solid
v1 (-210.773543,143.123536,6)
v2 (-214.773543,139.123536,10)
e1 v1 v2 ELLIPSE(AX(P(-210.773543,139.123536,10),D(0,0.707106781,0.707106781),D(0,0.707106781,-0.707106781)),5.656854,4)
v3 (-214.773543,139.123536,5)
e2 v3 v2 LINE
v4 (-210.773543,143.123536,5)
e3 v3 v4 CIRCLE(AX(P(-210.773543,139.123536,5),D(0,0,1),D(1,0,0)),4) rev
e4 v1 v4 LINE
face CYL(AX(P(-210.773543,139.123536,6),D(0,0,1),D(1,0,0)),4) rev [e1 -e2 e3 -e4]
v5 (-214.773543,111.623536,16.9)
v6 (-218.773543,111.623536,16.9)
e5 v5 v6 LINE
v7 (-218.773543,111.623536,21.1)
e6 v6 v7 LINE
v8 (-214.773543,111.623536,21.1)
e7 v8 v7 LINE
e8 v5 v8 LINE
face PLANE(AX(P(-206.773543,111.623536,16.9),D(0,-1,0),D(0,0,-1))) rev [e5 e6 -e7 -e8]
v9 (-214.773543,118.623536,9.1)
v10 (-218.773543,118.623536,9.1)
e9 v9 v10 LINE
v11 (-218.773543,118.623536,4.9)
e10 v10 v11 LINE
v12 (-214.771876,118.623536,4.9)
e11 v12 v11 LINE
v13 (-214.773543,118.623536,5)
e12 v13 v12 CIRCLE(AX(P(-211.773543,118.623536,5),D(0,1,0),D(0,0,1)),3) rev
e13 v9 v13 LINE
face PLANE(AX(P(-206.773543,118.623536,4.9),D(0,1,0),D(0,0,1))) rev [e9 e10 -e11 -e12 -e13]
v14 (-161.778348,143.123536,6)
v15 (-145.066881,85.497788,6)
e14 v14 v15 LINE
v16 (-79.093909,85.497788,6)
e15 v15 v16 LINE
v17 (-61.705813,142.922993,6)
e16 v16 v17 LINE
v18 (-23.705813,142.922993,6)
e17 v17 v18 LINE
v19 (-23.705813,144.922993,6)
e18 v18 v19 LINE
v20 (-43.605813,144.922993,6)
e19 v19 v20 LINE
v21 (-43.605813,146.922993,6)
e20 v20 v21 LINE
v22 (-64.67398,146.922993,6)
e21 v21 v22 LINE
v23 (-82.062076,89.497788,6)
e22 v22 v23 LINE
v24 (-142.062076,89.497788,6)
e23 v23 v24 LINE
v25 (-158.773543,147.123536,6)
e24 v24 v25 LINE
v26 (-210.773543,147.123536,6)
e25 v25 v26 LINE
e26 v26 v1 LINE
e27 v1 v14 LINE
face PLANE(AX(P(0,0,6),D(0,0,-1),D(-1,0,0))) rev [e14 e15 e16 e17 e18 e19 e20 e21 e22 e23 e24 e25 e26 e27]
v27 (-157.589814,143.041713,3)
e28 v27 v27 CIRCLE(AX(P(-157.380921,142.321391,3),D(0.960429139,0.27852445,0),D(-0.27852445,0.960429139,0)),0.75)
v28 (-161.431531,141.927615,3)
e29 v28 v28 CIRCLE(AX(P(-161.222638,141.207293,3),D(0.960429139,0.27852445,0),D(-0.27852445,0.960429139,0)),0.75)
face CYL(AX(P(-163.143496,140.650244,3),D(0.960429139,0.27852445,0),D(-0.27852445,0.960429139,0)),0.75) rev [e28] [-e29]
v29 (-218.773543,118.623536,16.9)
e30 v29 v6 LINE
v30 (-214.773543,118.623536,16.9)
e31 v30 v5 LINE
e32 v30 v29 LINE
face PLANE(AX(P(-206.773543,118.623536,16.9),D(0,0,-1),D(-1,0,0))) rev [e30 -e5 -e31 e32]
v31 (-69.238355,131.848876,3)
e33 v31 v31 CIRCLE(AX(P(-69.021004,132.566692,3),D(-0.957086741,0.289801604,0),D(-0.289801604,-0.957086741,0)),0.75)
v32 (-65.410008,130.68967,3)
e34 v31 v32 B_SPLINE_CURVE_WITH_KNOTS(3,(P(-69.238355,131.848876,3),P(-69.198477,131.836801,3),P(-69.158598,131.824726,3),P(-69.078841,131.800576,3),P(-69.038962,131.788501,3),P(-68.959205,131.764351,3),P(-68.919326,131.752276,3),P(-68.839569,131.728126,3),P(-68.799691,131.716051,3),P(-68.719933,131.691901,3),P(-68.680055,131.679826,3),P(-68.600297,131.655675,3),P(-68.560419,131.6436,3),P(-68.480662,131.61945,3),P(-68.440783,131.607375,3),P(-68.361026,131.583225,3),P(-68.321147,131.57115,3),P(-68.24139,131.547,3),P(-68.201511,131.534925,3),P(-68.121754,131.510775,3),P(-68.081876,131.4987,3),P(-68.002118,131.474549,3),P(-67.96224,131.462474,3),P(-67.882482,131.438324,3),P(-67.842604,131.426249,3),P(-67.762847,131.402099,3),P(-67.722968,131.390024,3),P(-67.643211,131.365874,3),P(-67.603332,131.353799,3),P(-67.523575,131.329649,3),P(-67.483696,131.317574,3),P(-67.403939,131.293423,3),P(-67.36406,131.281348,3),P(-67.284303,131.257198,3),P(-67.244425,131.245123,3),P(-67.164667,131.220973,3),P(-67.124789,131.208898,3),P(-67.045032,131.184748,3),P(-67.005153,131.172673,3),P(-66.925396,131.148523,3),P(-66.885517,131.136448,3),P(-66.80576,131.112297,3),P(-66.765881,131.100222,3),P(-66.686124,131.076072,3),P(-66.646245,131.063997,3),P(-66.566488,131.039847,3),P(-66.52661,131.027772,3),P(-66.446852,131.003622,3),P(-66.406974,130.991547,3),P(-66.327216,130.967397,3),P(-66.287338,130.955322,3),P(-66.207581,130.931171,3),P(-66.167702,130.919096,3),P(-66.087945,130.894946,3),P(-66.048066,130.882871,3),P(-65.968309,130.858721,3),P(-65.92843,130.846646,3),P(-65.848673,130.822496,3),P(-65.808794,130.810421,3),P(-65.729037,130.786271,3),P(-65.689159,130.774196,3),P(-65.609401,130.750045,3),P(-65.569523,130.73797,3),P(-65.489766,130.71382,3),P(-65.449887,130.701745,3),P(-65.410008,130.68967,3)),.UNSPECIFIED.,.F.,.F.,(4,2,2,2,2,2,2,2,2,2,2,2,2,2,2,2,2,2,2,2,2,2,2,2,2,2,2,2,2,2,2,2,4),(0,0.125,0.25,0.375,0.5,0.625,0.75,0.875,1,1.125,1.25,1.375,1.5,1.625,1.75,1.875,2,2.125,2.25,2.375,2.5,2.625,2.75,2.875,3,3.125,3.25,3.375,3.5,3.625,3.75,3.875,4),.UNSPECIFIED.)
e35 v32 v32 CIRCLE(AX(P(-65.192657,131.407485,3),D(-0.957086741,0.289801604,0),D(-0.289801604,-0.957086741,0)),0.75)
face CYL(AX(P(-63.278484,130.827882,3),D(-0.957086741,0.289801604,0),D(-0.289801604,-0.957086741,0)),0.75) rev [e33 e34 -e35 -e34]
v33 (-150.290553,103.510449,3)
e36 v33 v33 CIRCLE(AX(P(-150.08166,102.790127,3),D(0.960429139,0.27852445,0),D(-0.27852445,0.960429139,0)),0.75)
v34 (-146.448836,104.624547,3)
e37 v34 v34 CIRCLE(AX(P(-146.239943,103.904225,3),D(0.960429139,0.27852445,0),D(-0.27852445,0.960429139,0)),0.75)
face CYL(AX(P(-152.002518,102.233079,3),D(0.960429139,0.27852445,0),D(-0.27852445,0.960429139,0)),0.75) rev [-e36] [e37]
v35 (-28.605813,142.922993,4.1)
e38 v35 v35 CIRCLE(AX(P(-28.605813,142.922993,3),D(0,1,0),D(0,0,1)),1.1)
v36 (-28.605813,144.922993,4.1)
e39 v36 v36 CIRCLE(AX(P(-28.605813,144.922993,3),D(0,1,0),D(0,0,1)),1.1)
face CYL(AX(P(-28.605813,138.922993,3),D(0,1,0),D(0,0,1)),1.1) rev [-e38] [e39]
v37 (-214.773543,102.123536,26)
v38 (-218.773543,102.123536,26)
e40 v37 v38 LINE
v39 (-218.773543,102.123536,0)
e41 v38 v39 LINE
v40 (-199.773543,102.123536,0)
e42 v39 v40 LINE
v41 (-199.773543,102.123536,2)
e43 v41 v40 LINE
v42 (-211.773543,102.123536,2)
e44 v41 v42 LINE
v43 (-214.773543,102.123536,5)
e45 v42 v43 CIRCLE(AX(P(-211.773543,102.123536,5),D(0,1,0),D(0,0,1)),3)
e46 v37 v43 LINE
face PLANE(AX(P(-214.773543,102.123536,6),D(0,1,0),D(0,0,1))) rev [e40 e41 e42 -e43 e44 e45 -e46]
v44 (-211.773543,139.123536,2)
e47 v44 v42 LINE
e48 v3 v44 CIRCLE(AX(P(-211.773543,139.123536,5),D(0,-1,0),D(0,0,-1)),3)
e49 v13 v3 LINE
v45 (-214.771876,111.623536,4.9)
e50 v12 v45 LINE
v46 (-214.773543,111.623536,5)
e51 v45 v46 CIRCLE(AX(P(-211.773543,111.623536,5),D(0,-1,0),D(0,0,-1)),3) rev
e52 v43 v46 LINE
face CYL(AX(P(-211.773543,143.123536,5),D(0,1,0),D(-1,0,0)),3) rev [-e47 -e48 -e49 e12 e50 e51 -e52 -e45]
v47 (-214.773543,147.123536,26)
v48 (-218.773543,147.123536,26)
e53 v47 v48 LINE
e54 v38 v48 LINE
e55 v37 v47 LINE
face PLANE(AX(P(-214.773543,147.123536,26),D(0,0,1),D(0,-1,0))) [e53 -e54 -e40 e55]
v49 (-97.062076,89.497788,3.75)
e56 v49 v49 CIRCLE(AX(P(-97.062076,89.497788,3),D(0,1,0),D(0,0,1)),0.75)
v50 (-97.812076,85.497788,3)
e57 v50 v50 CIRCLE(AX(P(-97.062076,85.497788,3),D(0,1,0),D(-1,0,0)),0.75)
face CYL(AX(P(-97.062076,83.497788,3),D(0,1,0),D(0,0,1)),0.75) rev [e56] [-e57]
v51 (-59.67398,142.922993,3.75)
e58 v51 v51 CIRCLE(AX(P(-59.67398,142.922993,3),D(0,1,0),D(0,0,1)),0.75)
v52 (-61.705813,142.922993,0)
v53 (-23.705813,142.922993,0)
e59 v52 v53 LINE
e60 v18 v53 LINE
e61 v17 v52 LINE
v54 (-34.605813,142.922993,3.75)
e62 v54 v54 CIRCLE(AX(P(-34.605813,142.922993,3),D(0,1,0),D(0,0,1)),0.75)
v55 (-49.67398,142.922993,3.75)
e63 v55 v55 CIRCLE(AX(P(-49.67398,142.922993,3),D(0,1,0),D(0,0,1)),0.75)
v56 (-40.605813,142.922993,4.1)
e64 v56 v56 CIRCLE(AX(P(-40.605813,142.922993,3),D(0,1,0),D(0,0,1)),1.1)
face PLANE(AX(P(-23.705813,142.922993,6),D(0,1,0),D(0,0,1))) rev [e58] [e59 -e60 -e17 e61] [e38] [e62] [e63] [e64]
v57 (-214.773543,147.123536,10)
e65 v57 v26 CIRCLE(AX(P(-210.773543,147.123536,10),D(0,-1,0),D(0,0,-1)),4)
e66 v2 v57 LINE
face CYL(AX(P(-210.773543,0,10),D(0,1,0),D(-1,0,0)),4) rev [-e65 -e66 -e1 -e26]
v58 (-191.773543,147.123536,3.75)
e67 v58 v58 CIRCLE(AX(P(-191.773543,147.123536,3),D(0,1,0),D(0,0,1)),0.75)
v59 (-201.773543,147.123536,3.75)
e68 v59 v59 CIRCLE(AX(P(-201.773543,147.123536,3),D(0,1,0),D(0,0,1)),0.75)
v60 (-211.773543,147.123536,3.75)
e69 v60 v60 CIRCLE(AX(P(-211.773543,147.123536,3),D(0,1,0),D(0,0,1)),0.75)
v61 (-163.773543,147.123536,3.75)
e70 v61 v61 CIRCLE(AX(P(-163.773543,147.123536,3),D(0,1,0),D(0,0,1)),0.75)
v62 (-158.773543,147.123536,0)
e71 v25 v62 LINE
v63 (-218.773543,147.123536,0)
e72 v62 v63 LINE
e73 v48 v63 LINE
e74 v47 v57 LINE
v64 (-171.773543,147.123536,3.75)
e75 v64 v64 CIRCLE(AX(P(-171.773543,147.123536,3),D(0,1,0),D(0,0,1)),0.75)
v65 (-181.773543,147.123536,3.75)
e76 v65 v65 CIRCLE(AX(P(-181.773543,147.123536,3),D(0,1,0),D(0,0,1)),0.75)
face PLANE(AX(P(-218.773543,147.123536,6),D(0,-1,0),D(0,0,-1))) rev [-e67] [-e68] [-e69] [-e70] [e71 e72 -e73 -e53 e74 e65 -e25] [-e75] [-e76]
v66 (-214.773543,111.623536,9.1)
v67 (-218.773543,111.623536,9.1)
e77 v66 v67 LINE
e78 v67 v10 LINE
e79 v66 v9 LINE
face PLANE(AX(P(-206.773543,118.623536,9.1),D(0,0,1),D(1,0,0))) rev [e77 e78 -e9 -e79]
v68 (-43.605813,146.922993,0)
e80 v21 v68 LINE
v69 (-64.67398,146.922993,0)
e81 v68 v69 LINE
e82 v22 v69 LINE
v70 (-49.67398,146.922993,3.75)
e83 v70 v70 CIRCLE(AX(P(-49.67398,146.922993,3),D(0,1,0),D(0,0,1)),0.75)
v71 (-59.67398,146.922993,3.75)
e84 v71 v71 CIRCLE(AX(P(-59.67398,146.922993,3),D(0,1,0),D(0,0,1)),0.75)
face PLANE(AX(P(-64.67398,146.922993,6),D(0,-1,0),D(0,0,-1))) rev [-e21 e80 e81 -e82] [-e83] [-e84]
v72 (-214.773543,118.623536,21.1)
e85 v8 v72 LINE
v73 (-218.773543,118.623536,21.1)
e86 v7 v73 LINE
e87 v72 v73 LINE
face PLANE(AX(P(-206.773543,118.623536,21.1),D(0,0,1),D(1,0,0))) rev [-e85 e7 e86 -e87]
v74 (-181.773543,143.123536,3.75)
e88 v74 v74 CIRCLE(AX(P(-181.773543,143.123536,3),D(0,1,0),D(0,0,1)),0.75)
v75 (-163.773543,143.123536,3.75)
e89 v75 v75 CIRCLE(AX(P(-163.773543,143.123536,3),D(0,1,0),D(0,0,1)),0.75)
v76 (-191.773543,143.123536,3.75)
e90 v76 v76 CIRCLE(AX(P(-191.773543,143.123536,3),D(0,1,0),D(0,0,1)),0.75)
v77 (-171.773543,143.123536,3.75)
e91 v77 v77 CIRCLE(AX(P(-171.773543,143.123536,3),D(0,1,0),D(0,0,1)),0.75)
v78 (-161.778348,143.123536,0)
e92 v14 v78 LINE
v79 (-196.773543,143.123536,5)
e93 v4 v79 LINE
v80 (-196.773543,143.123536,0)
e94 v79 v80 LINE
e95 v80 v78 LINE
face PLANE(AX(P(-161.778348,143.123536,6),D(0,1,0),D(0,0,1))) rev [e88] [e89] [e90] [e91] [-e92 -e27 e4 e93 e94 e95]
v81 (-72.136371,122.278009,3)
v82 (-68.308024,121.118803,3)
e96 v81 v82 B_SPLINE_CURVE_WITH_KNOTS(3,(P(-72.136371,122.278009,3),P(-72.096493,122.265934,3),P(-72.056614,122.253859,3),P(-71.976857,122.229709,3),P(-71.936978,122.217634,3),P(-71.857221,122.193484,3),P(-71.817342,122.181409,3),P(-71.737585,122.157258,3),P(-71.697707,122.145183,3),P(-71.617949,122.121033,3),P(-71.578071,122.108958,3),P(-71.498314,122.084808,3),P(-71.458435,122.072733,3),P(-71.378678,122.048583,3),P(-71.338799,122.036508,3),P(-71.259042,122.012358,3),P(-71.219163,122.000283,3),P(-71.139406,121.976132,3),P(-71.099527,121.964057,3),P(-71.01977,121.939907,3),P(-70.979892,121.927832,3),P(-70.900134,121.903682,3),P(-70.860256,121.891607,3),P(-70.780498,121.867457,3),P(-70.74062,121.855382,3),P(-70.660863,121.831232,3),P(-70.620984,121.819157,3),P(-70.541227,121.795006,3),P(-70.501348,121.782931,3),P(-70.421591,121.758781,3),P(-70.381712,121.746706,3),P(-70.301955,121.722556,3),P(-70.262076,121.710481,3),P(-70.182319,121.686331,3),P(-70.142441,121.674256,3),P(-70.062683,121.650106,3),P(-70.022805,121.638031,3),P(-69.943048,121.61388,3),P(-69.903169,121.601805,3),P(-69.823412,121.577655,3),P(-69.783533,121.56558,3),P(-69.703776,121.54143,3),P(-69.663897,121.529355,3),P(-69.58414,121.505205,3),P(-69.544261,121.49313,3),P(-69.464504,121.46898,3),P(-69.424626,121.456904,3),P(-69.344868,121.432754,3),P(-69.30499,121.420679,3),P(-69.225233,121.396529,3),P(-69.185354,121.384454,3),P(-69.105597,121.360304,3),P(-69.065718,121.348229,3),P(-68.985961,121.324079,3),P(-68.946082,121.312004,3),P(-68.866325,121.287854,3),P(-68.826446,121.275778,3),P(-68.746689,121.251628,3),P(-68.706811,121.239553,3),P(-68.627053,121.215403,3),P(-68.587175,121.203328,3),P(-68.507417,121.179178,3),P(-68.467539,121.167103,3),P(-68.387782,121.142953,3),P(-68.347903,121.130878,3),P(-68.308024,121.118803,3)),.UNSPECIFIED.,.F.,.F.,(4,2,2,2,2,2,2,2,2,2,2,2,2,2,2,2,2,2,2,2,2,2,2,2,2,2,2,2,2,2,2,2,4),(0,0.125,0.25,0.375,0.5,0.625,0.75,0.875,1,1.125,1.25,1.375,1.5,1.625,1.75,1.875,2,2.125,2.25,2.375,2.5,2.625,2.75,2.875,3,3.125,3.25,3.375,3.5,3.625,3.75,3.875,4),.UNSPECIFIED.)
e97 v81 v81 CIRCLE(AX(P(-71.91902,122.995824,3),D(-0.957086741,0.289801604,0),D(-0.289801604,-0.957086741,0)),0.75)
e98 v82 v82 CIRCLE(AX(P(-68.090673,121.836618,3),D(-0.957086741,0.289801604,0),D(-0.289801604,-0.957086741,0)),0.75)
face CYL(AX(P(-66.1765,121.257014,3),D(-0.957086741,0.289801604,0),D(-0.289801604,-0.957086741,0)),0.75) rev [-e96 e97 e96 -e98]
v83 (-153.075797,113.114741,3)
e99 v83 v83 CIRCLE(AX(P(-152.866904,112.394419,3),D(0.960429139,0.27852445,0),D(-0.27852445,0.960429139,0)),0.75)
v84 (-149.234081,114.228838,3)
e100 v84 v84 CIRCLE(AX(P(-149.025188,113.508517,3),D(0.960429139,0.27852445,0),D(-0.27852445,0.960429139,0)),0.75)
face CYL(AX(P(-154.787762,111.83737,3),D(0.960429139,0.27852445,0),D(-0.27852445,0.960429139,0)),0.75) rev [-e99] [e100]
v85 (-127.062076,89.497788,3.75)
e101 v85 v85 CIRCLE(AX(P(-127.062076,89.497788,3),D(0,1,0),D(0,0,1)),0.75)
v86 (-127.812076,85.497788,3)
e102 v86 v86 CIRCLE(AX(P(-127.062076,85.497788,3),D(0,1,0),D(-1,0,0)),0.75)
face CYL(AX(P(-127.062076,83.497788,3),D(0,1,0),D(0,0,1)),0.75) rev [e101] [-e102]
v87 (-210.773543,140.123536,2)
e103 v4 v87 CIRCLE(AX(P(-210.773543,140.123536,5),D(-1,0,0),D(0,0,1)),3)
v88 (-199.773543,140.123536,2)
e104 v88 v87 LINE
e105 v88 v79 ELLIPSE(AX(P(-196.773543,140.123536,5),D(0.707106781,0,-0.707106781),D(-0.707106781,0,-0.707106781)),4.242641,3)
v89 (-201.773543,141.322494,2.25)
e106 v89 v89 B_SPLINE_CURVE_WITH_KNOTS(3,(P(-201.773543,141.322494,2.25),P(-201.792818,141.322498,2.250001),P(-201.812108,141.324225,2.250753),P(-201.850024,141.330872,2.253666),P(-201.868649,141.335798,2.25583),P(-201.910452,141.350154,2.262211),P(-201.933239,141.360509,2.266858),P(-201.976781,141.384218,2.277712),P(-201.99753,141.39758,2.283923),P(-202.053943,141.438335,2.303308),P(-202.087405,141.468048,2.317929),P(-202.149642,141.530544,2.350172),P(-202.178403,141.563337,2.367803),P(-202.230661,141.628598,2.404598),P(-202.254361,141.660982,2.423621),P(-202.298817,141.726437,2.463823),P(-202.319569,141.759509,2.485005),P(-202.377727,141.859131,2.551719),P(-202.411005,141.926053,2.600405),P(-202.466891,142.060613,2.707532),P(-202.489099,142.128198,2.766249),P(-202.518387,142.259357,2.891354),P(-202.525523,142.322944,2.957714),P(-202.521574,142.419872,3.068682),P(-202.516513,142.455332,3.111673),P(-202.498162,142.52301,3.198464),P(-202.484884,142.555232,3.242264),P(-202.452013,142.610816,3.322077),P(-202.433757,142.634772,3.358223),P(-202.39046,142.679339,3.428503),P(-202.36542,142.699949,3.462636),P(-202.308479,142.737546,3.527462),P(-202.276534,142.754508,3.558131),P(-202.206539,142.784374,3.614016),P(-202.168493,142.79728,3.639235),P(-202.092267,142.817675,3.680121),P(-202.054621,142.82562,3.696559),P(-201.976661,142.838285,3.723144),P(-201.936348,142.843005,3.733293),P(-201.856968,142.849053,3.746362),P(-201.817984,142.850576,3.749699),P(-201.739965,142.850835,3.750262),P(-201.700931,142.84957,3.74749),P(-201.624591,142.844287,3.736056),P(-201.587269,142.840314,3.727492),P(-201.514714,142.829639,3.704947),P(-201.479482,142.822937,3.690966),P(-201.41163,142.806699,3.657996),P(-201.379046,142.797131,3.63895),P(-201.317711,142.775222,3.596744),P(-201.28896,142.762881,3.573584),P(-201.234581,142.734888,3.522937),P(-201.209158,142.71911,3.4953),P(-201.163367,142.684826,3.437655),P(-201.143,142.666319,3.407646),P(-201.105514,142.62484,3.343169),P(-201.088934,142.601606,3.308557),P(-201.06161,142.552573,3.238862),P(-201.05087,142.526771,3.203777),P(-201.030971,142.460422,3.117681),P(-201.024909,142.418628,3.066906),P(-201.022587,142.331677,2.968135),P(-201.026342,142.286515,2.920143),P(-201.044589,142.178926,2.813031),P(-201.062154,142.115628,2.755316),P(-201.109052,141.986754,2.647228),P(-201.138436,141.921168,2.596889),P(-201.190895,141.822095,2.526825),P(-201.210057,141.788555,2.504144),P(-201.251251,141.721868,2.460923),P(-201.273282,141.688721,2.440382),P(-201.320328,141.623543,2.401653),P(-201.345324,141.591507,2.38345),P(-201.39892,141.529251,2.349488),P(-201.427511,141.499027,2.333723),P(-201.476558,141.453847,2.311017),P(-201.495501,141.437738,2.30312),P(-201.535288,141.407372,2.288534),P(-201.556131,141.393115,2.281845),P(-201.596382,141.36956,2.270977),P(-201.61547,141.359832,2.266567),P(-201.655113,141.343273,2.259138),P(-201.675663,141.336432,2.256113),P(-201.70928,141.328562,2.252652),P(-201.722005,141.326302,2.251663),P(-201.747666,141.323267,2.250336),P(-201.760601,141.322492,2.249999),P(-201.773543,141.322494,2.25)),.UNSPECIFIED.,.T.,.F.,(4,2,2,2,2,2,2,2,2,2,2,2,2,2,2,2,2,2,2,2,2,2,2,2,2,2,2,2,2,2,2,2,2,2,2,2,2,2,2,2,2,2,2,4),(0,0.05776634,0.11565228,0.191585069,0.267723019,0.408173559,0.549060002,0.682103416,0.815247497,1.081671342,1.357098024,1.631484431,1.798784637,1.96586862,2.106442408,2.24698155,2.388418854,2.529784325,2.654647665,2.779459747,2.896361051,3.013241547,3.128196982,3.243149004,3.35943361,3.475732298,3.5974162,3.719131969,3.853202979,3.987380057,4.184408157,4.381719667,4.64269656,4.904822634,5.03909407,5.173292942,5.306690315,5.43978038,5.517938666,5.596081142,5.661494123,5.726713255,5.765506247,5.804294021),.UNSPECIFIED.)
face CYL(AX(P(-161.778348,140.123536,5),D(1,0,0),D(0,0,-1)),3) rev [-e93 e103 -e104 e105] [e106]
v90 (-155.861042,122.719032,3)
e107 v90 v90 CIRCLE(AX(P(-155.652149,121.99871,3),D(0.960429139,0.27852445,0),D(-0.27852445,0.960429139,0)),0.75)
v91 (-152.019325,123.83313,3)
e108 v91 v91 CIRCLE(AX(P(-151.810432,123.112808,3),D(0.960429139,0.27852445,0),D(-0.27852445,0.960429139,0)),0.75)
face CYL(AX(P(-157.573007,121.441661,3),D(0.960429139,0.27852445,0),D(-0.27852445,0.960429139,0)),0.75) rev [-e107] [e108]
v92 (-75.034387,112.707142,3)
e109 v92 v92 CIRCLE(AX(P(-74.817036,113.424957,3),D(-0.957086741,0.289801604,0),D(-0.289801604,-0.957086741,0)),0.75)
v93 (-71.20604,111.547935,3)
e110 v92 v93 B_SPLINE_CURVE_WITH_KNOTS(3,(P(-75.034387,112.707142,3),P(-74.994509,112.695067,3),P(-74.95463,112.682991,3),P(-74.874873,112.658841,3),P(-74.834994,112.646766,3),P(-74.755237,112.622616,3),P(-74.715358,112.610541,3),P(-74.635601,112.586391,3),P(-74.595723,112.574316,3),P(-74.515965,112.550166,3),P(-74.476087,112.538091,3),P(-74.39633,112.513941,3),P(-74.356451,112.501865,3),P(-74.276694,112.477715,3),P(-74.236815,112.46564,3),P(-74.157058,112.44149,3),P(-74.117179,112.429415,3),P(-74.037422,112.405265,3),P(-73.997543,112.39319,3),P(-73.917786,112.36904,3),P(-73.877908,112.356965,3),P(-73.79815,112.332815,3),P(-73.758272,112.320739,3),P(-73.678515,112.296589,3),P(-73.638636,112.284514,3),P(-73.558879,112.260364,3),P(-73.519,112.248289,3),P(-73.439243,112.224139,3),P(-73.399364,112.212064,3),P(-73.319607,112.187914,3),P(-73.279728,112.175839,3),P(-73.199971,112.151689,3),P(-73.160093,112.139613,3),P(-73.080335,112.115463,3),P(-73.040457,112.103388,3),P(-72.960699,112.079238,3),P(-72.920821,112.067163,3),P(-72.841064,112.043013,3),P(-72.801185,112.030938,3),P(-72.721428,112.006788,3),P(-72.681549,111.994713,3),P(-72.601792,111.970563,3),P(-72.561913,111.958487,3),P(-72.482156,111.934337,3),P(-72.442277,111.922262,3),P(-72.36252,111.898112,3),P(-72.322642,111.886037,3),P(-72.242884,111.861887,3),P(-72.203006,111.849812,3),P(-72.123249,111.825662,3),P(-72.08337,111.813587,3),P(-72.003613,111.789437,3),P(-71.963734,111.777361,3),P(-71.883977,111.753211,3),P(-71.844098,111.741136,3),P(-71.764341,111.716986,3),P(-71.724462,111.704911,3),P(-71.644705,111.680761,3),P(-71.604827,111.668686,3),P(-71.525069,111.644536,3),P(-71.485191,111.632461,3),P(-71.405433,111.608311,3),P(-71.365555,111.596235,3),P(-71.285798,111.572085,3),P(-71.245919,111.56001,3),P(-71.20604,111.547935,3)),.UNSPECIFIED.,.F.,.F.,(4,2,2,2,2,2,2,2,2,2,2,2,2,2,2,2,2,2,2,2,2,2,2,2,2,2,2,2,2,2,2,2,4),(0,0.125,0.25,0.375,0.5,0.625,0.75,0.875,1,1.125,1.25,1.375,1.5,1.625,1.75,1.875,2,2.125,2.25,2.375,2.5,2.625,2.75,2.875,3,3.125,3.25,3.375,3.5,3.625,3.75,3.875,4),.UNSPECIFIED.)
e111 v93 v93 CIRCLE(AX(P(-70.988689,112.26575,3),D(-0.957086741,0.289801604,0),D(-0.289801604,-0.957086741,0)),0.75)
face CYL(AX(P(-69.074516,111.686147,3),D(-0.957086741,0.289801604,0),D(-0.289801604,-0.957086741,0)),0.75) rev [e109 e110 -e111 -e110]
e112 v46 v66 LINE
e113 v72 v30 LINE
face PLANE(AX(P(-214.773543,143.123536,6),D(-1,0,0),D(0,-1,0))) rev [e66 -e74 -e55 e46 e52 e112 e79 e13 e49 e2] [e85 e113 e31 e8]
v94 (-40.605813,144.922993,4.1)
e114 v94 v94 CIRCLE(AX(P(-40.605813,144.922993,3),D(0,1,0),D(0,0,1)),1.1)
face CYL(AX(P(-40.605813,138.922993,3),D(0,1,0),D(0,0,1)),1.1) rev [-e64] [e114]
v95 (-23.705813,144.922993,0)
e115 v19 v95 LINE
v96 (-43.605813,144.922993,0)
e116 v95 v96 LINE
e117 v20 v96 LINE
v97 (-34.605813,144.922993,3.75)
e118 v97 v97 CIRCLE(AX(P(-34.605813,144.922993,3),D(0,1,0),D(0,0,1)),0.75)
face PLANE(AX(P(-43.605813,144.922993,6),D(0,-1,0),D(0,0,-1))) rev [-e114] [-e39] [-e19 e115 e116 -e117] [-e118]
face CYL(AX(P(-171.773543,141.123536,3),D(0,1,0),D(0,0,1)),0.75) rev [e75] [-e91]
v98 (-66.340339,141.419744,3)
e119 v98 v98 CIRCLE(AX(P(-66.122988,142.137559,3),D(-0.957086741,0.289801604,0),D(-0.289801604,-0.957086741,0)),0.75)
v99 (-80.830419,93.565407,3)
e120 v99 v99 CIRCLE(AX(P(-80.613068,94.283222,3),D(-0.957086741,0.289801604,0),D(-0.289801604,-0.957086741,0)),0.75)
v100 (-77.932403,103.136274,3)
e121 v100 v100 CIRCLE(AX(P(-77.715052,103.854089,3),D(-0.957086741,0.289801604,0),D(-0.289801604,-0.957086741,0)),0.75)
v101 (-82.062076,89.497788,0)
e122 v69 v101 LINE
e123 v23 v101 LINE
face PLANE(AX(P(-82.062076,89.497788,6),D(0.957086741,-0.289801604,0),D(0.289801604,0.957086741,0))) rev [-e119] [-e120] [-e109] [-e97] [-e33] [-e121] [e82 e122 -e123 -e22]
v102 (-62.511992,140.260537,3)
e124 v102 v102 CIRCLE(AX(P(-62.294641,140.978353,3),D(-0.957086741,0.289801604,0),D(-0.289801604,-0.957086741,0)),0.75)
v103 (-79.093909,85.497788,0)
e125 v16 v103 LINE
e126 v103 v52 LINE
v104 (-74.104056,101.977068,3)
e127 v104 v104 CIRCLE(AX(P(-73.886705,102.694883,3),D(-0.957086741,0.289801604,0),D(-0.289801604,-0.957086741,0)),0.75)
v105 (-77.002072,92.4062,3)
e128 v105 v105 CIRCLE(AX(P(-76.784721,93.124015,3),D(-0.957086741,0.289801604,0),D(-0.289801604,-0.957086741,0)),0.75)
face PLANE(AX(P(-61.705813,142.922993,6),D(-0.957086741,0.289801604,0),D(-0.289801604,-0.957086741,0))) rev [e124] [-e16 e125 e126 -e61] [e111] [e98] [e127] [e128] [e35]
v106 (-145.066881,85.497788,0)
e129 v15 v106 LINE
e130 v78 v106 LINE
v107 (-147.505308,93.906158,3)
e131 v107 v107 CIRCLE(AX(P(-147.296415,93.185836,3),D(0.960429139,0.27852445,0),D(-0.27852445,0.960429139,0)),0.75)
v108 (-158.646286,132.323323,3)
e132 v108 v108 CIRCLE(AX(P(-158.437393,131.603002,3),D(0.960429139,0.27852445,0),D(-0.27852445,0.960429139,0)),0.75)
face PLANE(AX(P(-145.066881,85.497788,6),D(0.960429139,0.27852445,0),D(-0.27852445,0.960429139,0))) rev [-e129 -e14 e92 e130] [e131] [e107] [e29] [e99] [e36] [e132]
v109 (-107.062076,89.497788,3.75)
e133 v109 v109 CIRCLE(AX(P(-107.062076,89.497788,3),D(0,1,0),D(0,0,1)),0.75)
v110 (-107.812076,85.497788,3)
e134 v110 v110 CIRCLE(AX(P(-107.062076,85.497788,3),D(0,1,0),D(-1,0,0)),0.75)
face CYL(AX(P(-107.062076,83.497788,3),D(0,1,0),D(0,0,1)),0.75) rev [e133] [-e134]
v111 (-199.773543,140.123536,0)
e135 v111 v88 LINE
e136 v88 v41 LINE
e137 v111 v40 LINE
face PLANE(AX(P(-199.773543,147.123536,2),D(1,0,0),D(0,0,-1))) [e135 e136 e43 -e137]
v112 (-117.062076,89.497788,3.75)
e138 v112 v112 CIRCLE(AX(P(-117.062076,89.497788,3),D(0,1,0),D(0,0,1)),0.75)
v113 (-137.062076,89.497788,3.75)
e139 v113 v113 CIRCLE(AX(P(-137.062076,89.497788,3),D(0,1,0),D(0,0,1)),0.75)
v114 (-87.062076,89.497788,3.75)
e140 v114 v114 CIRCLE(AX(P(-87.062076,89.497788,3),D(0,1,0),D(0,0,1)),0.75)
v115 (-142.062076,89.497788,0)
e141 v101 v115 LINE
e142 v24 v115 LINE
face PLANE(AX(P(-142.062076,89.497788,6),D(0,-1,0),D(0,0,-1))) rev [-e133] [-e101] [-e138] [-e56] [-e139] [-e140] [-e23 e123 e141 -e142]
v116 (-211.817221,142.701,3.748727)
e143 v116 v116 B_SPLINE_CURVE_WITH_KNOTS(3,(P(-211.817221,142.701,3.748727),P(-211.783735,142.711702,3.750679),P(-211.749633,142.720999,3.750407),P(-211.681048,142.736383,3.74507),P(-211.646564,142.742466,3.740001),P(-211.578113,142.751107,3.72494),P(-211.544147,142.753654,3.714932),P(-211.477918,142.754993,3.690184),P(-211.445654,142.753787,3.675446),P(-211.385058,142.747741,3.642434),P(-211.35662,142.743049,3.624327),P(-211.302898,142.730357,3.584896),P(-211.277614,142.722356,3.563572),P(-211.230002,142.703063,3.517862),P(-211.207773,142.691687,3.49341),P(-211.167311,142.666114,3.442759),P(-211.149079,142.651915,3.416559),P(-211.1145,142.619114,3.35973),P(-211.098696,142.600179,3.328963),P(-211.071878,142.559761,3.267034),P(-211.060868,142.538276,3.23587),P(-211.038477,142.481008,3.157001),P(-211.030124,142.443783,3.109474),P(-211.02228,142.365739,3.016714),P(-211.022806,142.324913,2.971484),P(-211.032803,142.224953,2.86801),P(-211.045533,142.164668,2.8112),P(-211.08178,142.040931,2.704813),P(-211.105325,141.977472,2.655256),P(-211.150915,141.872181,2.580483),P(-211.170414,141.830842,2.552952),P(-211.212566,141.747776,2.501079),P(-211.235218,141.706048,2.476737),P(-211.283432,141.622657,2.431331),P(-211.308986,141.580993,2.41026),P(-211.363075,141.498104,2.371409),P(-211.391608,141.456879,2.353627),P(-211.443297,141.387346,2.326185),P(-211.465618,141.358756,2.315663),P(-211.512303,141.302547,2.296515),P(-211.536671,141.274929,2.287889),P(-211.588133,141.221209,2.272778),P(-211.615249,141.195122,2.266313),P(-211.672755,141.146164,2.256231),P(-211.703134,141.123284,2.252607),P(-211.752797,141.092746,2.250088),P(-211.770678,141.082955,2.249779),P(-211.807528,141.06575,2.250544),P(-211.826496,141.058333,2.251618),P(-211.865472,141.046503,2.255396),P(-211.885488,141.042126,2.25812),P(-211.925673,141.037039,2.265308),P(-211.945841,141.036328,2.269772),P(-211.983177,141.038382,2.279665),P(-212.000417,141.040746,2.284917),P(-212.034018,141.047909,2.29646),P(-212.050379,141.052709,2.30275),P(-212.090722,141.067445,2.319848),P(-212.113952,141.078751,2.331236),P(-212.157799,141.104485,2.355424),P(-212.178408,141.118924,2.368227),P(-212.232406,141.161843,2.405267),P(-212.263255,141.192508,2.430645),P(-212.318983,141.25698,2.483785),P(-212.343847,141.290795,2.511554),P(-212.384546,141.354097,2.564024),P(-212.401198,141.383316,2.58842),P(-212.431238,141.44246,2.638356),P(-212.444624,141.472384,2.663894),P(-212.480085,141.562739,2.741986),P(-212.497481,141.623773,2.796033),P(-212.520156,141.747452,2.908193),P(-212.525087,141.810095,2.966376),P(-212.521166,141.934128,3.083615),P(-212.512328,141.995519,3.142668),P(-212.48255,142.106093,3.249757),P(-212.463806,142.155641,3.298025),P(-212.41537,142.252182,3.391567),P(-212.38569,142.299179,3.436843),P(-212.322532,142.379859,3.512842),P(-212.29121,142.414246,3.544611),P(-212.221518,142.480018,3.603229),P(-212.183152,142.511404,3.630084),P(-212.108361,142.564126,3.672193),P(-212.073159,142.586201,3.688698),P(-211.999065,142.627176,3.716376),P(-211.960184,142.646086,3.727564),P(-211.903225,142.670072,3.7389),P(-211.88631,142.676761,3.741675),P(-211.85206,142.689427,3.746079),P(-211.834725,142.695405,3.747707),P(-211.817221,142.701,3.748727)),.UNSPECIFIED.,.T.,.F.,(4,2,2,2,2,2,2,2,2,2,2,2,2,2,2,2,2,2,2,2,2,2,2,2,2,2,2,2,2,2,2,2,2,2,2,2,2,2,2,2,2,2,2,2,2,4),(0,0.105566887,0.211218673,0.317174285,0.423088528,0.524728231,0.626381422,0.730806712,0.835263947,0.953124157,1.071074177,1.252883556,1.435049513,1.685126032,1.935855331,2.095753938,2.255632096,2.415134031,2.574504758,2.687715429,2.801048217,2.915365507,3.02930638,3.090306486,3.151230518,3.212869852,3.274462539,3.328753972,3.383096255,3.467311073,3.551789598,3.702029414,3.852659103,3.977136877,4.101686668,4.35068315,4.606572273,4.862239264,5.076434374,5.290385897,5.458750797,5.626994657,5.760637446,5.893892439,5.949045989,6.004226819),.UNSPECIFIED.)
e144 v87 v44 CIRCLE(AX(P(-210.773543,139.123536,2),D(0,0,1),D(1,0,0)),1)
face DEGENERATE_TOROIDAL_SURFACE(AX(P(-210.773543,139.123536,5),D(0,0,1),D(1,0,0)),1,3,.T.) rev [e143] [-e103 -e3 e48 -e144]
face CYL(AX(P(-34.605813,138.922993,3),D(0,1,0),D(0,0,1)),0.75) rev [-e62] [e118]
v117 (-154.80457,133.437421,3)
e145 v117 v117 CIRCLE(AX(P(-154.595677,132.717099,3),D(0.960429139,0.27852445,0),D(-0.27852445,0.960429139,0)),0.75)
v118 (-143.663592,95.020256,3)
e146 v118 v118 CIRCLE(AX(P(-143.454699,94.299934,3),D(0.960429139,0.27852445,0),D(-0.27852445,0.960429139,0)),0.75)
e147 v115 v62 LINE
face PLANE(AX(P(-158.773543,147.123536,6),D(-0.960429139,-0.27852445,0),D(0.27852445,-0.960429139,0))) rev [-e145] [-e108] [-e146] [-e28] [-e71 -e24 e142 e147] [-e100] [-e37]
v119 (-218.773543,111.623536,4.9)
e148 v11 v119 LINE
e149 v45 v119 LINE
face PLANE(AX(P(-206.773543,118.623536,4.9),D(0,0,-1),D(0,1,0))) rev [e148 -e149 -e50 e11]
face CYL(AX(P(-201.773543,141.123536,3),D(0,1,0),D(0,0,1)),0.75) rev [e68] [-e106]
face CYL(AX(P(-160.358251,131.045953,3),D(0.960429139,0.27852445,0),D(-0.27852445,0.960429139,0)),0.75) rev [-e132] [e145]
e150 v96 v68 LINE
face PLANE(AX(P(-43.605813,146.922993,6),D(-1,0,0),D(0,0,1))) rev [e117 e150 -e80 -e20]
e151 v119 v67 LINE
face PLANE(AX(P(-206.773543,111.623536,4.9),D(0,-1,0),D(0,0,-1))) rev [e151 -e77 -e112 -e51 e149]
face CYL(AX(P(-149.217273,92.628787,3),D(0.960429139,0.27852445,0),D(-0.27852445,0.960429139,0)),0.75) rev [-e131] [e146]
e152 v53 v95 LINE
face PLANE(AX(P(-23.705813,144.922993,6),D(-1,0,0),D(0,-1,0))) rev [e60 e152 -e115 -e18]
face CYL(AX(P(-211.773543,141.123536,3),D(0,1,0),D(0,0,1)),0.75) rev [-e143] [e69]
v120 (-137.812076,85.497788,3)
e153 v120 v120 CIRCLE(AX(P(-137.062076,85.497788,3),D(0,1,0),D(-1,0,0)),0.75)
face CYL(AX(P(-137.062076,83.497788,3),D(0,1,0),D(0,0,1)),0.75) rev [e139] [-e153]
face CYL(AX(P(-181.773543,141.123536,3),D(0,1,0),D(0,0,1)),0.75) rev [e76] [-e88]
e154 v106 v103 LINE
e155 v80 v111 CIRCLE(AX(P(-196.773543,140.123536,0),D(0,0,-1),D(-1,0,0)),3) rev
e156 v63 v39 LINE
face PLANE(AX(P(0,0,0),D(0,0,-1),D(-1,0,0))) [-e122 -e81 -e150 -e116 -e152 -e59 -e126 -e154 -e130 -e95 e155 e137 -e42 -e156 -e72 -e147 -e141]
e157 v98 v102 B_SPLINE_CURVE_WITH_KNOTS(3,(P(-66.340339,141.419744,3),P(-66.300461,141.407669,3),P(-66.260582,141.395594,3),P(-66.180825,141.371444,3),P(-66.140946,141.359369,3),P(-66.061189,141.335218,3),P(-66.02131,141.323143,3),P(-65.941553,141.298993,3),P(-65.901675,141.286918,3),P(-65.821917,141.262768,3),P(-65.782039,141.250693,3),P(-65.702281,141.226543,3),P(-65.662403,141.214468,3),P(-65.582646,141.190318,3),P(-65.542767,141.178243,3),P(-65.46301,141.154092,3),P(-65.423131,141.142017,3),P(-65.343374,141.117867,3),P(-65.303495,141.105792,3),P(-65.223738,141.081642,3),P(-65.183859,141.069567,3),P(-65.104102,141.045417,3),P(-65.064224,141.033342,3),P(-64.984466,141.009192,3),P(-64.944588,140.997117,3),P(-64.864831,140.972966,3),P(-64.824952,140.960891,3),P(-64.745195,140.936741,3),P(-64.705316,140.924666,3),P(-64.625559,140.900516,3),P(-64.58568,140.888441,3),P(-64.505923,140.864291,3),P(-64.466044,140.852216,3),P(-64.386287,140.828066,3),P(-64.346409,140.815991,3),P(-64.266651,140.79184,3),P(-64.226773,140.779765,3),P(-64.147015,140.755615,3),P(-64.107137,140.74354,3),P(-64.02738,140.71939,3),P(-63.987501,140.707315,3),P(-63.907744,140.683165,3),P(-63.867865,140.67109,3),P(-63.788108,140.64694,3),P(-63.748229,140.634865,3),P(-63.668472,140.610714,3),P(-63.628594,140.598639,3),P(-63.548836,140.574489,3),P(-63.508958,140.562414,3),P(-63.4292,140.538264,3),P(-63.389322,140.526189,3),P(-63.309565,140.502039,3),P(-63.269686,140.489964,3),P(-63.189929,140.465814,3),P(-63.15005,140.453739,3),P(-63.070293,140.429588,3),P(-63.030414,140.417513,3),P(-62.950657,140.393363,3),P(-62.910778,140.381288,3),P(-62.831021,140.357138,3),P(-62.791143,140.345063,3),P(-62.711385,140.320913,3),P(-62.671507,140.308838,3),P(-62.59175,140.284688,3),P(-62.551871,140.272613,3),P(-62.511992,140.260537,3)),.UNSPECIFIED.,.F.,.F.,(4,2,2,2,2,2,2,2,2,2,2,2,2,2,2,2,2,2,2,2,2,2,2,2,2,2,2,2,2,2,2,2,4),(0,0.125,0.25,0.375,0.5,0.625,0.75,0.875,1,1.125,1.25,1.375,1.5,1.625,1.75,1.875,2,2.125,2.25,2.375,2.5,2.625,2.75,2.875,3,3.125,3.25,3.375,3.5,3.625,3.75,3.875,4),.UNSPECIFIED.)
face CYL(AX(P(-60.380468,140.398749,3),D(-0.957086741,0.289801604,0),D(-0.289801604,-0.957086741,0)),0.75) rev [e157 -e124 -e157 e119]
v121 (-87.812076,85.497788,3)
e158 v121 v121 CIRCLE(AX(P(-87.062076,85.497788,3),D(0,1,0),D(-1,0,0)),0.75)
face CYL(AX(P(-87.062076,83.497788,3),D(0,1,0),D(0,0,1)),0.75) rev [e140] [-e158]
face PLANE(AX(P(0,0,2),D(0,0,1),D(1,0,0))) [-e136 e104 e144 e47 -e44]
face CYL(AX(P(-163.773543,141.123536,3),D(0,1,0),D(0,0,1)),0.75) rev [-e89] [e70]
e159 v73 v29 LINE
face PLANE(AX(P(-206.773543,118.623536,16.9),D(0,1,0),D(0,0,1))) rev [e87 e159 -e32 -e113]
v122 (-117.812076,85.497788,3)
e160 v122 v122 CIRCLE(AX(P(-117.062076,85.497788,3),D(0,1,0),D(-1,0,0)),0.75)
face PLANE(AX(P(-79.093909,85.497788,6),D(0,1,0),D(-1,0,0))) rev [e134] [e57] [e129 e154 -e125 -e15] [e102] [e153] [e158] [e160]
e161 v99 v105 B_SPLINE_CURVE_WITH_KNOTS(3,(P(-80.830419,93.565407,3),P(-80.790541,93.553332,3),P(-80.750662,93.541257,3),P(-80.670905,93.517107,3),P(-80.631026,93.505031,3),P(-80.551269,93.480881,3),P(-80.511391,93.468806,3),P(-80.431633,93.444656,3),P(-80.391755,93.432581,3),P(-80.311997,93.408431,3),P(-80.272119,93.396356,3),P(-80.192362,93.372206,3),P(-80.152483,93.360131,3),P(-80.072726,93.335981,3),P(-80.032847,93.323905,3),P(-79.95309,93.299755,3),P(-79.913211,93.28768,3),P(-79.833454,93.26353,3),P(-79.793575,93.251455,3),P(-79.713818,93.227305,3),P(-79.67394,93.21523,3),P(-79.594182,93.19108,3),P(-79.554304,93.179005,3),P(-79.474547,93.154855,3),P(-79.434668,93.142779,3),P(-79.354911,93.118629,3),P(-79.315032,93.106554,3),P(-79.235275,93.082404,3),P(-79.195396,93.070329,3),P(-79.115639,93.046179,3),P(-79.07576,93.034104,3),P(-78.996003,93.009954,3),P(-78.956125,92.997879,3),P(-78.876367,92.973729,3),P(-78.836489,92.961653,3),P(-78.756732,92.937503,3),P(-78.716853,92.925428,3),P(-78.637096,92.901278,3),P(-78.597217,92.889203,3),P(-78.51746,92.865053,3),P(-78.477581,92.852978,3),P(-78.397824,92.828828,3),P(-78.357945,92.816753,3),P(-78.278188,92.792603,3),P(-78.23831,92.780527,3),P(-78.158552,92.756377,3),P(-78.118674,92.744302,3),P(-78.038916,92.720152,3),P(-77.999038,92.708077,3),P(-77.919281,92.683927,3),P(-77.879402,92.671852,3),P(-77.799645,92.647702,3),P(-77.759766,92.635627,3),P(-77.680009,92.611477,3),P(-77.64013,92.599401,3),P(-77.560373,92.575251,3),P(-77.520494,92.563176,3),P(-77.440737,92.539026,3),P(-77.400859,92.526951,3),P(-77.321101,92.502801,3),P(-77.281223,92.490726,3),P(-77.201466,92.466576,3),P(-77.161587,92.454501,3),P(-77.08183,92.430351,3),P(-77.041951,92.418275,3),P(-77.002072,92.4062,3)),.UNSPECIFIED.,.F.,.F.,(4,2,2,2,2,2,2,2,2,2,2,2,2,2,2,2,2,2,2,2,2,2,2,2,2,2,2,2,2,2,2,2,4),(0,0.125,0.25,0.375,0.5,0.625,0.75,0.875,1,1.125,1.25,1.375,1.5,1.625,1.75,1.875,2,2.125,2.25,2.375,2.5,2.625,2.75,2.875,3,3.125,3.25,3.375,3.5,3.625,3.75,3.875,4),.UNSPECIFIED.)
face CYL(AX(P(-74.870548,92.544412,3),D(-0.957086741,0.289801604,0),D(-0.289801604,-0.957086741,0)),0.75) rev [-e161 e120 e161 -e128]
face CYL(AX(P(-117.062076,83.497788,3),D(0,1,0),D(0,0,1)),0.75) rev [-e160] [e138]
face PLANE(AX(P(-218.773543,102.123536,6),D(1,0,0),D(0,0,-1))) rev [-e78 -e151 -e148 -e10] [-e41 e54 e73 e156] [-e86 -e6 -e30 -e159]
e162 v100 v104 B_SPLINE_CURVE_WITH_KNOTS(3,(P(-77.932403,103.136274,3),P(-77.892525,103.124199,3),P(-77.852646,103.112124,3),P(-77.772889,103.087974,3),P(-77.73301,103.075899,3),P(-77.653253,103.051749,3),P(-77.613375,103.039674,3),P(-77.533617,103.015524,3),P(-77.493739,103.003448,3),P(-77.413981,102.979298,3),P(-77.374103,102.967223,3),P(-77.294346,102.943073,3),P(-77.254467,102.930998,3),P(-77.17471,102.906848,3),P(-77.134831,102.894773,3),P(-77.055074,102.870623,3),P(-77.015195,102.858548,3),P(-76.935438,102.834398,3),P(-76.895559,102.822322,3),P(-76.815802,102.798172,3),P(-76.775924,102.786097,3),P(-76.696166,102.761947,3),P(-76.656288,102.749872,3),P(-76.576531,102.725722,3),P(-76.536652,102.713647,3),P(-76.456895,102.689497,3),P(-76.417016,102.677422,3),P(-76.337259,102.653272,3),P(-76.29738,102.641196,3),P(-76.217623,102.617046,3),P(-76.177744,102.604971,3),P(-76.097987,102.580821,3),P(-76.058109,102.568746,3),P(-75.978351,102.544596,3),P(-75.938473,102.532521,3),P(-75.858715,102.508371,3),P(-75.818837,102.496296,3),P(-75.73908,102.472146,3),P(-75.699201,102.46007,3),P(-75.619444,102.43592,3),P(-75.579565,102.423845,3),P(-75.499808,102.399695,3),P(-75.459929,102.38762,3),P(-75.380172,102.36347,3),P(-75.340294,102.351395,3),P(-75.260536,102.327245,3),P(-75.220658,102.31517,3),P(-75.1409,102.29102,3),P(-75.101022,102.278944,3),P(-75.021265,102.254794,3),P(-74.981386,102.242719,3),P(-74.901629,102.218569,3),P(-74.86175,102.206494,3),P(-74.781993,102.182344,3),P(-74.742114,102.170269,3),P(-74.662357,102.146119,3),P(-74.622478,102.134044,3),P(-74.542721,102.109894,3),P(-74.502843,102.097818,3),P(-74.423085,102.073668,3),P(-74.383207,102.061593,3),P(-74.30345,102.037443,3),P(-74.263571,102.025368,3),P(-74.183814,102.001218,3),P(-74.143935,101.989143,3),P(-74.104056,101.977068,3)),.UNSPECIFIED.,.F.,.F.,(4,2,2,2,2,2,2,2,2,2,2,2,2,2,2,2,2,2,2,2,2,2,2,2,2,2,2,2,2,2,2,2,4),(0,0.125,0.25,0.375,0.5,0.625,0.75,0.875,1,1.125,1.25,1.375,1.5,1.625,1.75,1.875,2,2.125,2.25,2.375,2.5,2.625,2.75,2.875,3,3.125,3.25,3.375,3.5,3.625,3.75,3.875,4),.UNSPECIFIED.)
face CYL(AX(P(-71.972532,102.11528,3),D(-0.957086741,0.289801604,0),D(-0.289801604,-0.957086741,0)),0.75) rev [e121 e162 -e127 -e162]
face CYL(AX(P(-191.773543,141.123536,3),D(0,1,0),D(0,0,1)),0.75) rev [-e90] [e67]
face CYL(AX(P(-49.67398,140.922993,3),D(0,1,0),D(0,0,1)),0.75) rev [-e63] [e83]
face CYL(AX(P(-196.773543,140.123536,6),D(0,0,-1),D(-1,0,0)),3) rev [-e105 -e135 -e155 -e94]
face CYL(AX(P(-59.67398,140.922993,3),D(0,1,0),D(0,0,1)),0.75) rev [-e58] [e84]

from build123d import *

# Parameters (mm, degrees)
BOSS_EXTRUDE1_DEPTH = 6
SKETCH2_R           = 1.1
CUT_EXTRUDE1_DEPTH  = 6
SKETCH3_R           = 0.75
CUT_EXTRUDE2_DEPTH  = 6
SKETCH4_R           = 0.75
CUT_EXTRUDE3_DEPTH  = 6
SKETCH5_R           = 0.75
CUT_EXTRUDE4_DEPTH  = 6
SKETCH6_R           = 0.75
CUT_EXTRUDE5_DEPTH  = 6
SKETCH7_R           = 0.75
CUT_EXTRUDE6_DEPTH  = 6
SKETCH8_R           = 0.75
CUT_EXTRUDE7_DEPTH  = 6
SKETCH9_R           = 0.75
CUT_EXTRUDE8_DEPTH  = 6
SKETCH12_W          = 20
SKETCH12_H          = 45
BOSS_EXTRUDE5_DEPTH = 4
FILLET4_R           = 4
SKETCH13_W          = 19
SKETCH13_H          = 45
BOSS_EXTRUDE6_DEPTH = 2
FILLET5_R           = 3
SKETCH14_W          = 4.2
SKETCH14_H          = 7
CUT_EXTRUDE10_DEPTH = 12


with BuildPart() as part:
    # Sketch1 → Boss-Extrude1 (new body)
    with BuildSketch(Plane.XY):
        Polygon((-23.705812739, 144.922992632), (-23.705812739, 142.922992632), (-61.705812739, 142.922992632), (-79.093908962, 85.497788151), (-145.066881196, 85.497788151), (-161.778348211, 143.123536478), (-214.773543294, 143.123536478), (-214.773543294, 102.123536478), (-218.773543294, 102.123536478), (-218.773543294, 147.123536478), (-158.773543294, 147.123536478), (-142.062076279, 89.497788151), (-82.062076279, 89.497788151), (-64.673980056, 146.922992632), (-43.605812739, 146.922992632), (-43.605812739, 144.922992632), align=None)
    extrude(amount=BOSS_EXTRUDE1_DEPTH)

    # Sketch2 → Cut-Extrude1 (cut)
    with BuildSketch(Plane(origin=(0, 144.922992632, 0), x_dir=(1, 0, 0), z_dir=(0, 1, 0))):
        with Locations(Location((-28.605812739, -3, 0), (0, 0, 270))):
            Circle(SKETCH2_R)
        with Locations(Location((-40.605812739, -3, 0), (0, 0, 270))):
            Circle(SKETCH2_R)
    extrude(amount=-CUT_EXTRUDE1_DEPTH, mode=Mode.SUBTRACT)

    # Sketch3 → Cut-Extrude2 (cut)
    with BuildSketch(Plane(origin=(0, 144.922992632, 0), x_dir=(1, 0, 0), z_dir=(0, 1, 0))):
        with Locations(Location((-34.605812739, -3, 0), (0, 0, 270))):
            Circle(SKETCH3_R)
    extrude(amount=-CUT_EXTRUDE2_DEPTH, mode=Mode.SUBTRACT)

    # Sketch4 → Cut-Extrude3 (cut)
    with BuildSketch(Plane(origin=(0, 146.922992632, 0), x_dir=(1, 0, 0), z_dir=(0, 1, 0))):
        with Locations(Location((-59.673980056, -3, 0), (0, 0, 270))):
            Circle(SKETCH4_R)
        with Locations(Location((-49.673980056, -3, 0), (0, 0, 270))):
            Circle(SKETCH4_R)
    extrude(amount=-CUT_EXTRUDE3_DEPTH, mode=Mode.SUBTRACT)

    # Sketch5 → Cut-Extrude4 (cut)
    with BuildSketch(Plane(origin=(-99.993673707, 30.277639163, 0), x_dir=(0, 0, 1), z_dir=(-0.957086741355951, 0.28980160372338726, 0))):
        with Locations(Location((3, 116.875425109, 0), (0, 0, 270))):
            Circle(SKETCH5_R)
        with Locations(Location((3, 106.875425109, 0), (0, 0, 270))):
            Circle(SKETCH5_R)
        with Locations(Location((3, 96.875425109, 0), (0, 0, 270))):
            Circle(SKETCH5_R)
        with Locations(Location((3, 86.875425109, 0), (0, 0, 270))):
            Circle(SKETCH5_R)
        with Locations(Location((3, 76.875425109, 0), (0, 0, 270))):
            Circle(SKETCH5_R)
        with Locations(Location((3, 66.875425109, 0), (0, 0, 270))):
            Circle(SKETCH5_R)
    extrude(amount=-CUT_EXTRUDE4_DEPTH, mode=Mode.SUBTRACT)

    # Sketch6 → Cut-Extrude5 (cut)
    with BuildSketch(Plane(origin=(0, 89.497788151, 0), x_dir=(1, 0, 0), z_dir=(0, 1, 0))):
        with Locations(Location((-87.062076279, -3, 0), (0, 0, 270))):
            Circle(SKETCH6_R)
        with Locations(Location((-97.062076279, -3, 0), (0, 0, 270))):
            Circle(SKETCH6_R)
        with Locations(Location((-107.062076279, -3, 0), (0, 0, 270))):
            Circle(SKETCH6_R)
        with Locations(Location((-117.062076279, -3, 0), (0, 0, 270))):
            Circle(SKETCH6_R)
        with Locations(Location((-127.062076279, -3, 0), (0, 0, 270))):
            Circle(SKETCH6_R)
        with Locations(Location((-137.062076279, -3, 0), (0, 0, 270))):
            Circle(SKETCH6_R)
    extrude(amount=-CUT_EXTRUDE5_DEPTH, mode=Mode.SUBTRACT)

    # Sketch7 → Cut-Extrude6 (cut)
    with BuildSketch(Plane(origin=(-107.100560571, -31.059162566, 0), x_dir=(0, 0, -1), z_dir=(0.960429138778729, 0.27852445024584294, 0))):
        with Locations(Location((-3, 180.524045293, 0), (0, 0, 90))):
            Circle(SKETCH7_R)
        with Locations(Location((-3, 170.524045293, 0), (0, 0, 90))):
            Circle(SKETCH7_R)
        with Locations(Location((-3, 160.524045293, 0), (0, 0, 90))):
            Circle(SKETCH7_R)
        with Locations(Location((-3, 150.524045293, 0), (0, 0, 90))):
            Circle(SKETCH7_R)
        with Locations(Location((-3, 140.524045293, 0), (0, 0, 90))):
            Circle(SKETCH7_R)
        with Locations(Location((-3, 130.524045293, 0), (0, 0, 90))):
            Circle(SKETCH7_R)
    extrude(amount=-CUT_EXTRUDE6_DEPTH, mode=Mode.SUBTRACT)

    # Sketch8 → Cut-Extrude7 (cut)
    with BuildSketch(Plane(origin=(0, 147.123536478, 0), x_dir=(1, 0, 0), z_dir=(0, 1, 0))):
        with Locations(Location((-211.773543294, -3, 0), (0, 0, 270))):
            Circle(SKETCH8_R)
        with Locations(Location((-201.773543294, -3, 0), (0, 0, 270))):
            Circle(SKETCH8_R)
        with Locations(Location((-191.773543294, -3, 0), (0, 0, 270))):
            Circle(SKETCH8_R)
        with Locations(Location((-181.773543294, -3, 0), (0, 0, 270))):
            Circle(SKETCH8_R)
        with Locations(Location((-171.773543294, -3, 0), (0, 0, 270))):
            Circle(SKETCH8_R)
    extrude(amount=-CUT_EXTRUDE7_DEPTH, mode=Mode.SUBTRACT)

    # Sketch9 → Cut-Extrude8 (cut)
    with BuildSketch(Plane(origin=(0, 147.123536478, 0), x_dir=(1, 0, 0), z_dir=(0, 1, 0))):
        with Locations(Location((-163.773543294, -3, 0), (0, 0, 270))):
            Circle(SKETCH9_R)
    extrude(amount=-CUT_EXTRUDE8_DEPTH, mode=Mode.SUBTRACT)

    # Sketch12 → Boss-Extrude5 (add)
    with BuildSketch(Plane.ZY.offset(218.773543294)):
        with Locations((16, 124.623536478)):
            Rectangle(SKETCH12_W, SKETCH12_H)
    extrude(amount=-BOSS_EXTRUDE5_DEPTH)

    # Fillet4
    # the kernel refuses this fillet: 4 mm, written as the material it adds along each edge
    with BuildSketch(Plane(origin=(-214.773543294, 143.123536478, 6), x_dir=(1, 0, 0), z_dir=(0, 1, 0))) as fillet4_piece_1:
        with BuildLine():
            CenterArc((FILLET4_R, -FILLET4_R), FILLET4_R, 90, 90)
            Line((0, -FILLET4_R), (0, 0))
            Line((0, 0), (FILLET4_R, 0))
        make_face()
    extrude(amount=4)
    with BuildSketch(Plane(origin=(-214.773543294, 143.123536478, 0), x_dir=(1, 0, 0), z_dir=(0, 0, 1))) as fillet4_piece_2_section:
        with BuildLine():
            CenterArc((FILLET4_R, -FILLET4_R), FILLET4_R, 90, 90)
            Line((0, -FILLET4_R), (0, 0))
            Line((0, 0), (FILLET4_R, 0))
        make_face()
    fillet4_piece_2 = extrude(amount=6, mode=Mode.PRIVATE)
    fillet4_piece_2 = fillet4_piece_2 - Plane(origin=(-211.773543294, 142.203820796, 3), x_dir=(0, 0, 1), z_dir=(0, 1, 0)) * Cylinder(0.75, 28, mode=Mode.PRIVATE)
    add(fillet4_piece_2)
    with BuildSketch(Plane(origin=(-214.773543294, 133.123536478, 6), x_dir=(1, 0, 0), z_dir=(0, 1, 0))) as fillet4_piece_3a_section:
        with BuildLine():
            CenterArc((FILLET4_R, -FILLET4_R), FILLET4_R, 90, 90)
            Line((0, -FILLET4_R), (0, 0))
            Line((0, 0), (FILLET4_R, 0))
        make_face()
    fillet4_piece_3a = extrude(amount=14, mode=Mode.PRIVATE)
    fillet4_piece_3a = split(fillet4_piece_3a, bisect_by=Plane(origin=(-213.867962837, 143.123536478, 6.905580457), z_dir=(0, -1, 0)), keep=Keep.TOP, mode=Mode.PRIVATE)
    with BuildSketch(Plane(origin=(-214.773543294, 143.123536478, 0), x_dir=(1, 0, 0), z_dir=(0, 0, 1))) as fillet4_piece_3b_section:
        with BuildLine():
            CenterArc((FILLET4_R, -FILLET4_R), FILLET4_R, 90, 90)
            Line((0, -FILLET4_R), (0, 0))
            Line((0, 0), (FILLET4_R, 0))
        make_face()
    fillet4_piece_3b = extrude(amount=16, mode=Mode.PRIVATE)
    fillet4_piece_3b = split(fillet4_piece_3b, bisect_by=Plane(origin=(-213.867962837, 142.217956021, 6), z_dir=(0, 0, 1)), keep=Keep.TOP, mode=Mode.PRIVATE)
    fillet4_piece_3 = fillet4_piece_3a & fillet4_piece_3b
    add(fillet4_piece_3)

    # Sketch13 → Boss-Extrude6 (add)
    with BuildSketch(Plane(origin=(0, 0, 0), x_dir=(-1, 0, 0), z_dir=(0, 0, -1))):
        with Locations((209.273543294, 124.623536478)):
            Rectangle(SKETCH13_W, SKETCH13_H)
    extrude(amount=-BOSS_EXTRUDE6_DEPTH)

    # Fillet5
    # the kernel refuses this fillet: 3 mm, written as the material it adds along each edge
    with BuildSketch(Plane(origin=(-210.773543294, 139.123536478, 2), x_dir=(-1, 0, 0), z_dir=(0, -1, 0))) as fillet5_piece_1_section:
        with BuildLine():
            CenterArc((4 - FILLET5_R, -FILLET5_R), FILLET5_R, 0, 90)
            Line((4, -FILLET5_R), (4, 0))
            Line((4, 0), (4 - FILLET5_R, 0))
        make_face()
    fillet5_piece_1 = revolve(axis=Axis((-210.773543294, 139.123536478, 2), (0, 0, -1)), revolution_arc=90, mode=Mode.PRIVATE)
    fillet5_piece_1 = fillet5_piece_1 - Plane(origin=(-211.773543294, 141.130848213, 3), x_dir=(0, 0, 1), z_dir=(0, 1, 0)) * Cylinder(0.75, 16, mode=Mode.PRIVATE)
    add(fillet5_piece_1)
    with BuildSketch(Plane(origin=(-199.773543294, 143.123536478, 0), x_dir=(0, -1, 0), z_dir=(0, 0, 1))) as fillet5_piece_2:
        with BuildLine():
            CenterArc((FILLET5_R, FILLET5_R), FILLET5_R, 180, 90)
            Line((0, FILLET5_R), (0, 0))
            Line((0, 0), (FILLET5_R, 0))
        make_face()
    extrude(amount=2)
    with BuildSketch(Plane(origin=(-214.773543294, 102.123536478, 2), x_dir=(0, 0, 1), z_dir=(0, 1, 0))) as fillet5_piece_3:
        with BuildLine():
            CenterArc((FILLET5_R, FILLET5_R), FILLET5_R, 180, 90)
            Line((0, FILLET5_R), (0, 0))
            Line((0, 0), (FILLET5_R, 0))
        make_face()
    extrude(amount=37)
    with BuildSketch(Plane(origin=(-210.773543294, 143.123536478, 2), x_dir=(0, 0, 1), z_dir=(1, 0, 0))) as fillet5_piece_4_section:
        with BuildLine():
            CenterArc((FILLET5_R, FILLET5_R), FILLET5_R, 180, 90)
            Line((0, FILLET5_R), (0, 0))
            Line((0, 0), (FILLET5_R, 0))
        make_face()
    fillet5_piece_4 = extrude(amount=11, mode=Mode.PRIVATE)
    fillet5_piece_4 = fillet5_piece_4 - Plane(origin=(-201.773543294, 142.429647528, 3), x_dir=(0, 0, 1), z_dir=(0, 1, 0)) * Cylinder(0.75, 35, mode=Mode.PRIVATE)
    add(fillet5_piece_4)
    with BuildSketch(Plane(origin=(-199.773543294, 143.123536478, 0), x_dir=(0, -1, 0), z_dir=(0, 0, 1))) as fillet5_piece_5a_section:
        with BuildLine():
            CenterArc((FILLET5_R, FILLET5_R), FILLET5_R, 180, 90)
            Line((0, FILLET5_R), (0, 0))
            Line((0, 0), (FILLET5_R, 0))
        make_face()
    fillet5_piece_5a = extrude(amount=9.5, mode=Mode.PRIVATE)
    fillet5_piece_5a = split(fillet5_piece_5a, bisect_by=Plane(origin=(-199.094357951, 142.444351135, 2), z_dir=(0, 0, 1)), keep=Keep.TOP, mode=Mode.PRIVATE)
    fillet5_piece_5a = split(fillet5_piece_5a, bisect_by=Plane(origin=(-199.094357951, 142.444351135, 6), z_dir=(0, 0, -1)), keep=Keep.TOP, mode=Mode.PRIVATE)
    with BuildSketch(Plane(origin=(-210.773543294, 143.123536478, 2), x_dir=(0, 0, 1), z_dir=(1, 0, 0))) as fillet5_piece_5b_section:
        with BuildLine():
            CenterArc((FILLET5_R, FILLET5_R), FILLET5_R, 180, 90)
            Line((0, FILLET5_R), (0, 0))
            Line((0, 0), (FILLET5_R, 0))
        make_face()
    fillet5_piece_5b = extrude(amount=18.5, mode=Mode.PRIVATE)
    fillet5_piece_5b = split(fillet5_piece_5b, bisect_by=Plane(origin=(-199.773543294, 142.441638418, 2.676766497), z_dir=(1, 0, 0)), keep=Keep.TOP, mode=Mode.PRIVATE)
    fillet5_piece_5b = fillet5_piece_5b - Plane(origin=(-191.773543294, 142.441638418, 3), x_dir=(0, 0, 1), z_dir=(0, 1, 0)) * Cylinder(0.75, 50, mode=Mode.PRIVATE)
    fillet5_piece_5 = fillet5_piece_5a & fillet5_piece_5b
    add(fillet5_piece_5)

    # Sketch14 → Cut-Extrude10 (cut)
    with BuildSketch(Plane.ZY.offset(218.773543294)):
        with Locations((7, 115.123536478)):
            Rectangle(SKETCH14_W, SKETCH14_H)
        with Locations((19, 115.123536478)):
            Rectangle(SKETCH14_W, SKETCH14_H)
    extrude(amount=-CUT_EXTRUDE10_DEPTH, mode=Mode.SUBTRACT)


solid = part.part
